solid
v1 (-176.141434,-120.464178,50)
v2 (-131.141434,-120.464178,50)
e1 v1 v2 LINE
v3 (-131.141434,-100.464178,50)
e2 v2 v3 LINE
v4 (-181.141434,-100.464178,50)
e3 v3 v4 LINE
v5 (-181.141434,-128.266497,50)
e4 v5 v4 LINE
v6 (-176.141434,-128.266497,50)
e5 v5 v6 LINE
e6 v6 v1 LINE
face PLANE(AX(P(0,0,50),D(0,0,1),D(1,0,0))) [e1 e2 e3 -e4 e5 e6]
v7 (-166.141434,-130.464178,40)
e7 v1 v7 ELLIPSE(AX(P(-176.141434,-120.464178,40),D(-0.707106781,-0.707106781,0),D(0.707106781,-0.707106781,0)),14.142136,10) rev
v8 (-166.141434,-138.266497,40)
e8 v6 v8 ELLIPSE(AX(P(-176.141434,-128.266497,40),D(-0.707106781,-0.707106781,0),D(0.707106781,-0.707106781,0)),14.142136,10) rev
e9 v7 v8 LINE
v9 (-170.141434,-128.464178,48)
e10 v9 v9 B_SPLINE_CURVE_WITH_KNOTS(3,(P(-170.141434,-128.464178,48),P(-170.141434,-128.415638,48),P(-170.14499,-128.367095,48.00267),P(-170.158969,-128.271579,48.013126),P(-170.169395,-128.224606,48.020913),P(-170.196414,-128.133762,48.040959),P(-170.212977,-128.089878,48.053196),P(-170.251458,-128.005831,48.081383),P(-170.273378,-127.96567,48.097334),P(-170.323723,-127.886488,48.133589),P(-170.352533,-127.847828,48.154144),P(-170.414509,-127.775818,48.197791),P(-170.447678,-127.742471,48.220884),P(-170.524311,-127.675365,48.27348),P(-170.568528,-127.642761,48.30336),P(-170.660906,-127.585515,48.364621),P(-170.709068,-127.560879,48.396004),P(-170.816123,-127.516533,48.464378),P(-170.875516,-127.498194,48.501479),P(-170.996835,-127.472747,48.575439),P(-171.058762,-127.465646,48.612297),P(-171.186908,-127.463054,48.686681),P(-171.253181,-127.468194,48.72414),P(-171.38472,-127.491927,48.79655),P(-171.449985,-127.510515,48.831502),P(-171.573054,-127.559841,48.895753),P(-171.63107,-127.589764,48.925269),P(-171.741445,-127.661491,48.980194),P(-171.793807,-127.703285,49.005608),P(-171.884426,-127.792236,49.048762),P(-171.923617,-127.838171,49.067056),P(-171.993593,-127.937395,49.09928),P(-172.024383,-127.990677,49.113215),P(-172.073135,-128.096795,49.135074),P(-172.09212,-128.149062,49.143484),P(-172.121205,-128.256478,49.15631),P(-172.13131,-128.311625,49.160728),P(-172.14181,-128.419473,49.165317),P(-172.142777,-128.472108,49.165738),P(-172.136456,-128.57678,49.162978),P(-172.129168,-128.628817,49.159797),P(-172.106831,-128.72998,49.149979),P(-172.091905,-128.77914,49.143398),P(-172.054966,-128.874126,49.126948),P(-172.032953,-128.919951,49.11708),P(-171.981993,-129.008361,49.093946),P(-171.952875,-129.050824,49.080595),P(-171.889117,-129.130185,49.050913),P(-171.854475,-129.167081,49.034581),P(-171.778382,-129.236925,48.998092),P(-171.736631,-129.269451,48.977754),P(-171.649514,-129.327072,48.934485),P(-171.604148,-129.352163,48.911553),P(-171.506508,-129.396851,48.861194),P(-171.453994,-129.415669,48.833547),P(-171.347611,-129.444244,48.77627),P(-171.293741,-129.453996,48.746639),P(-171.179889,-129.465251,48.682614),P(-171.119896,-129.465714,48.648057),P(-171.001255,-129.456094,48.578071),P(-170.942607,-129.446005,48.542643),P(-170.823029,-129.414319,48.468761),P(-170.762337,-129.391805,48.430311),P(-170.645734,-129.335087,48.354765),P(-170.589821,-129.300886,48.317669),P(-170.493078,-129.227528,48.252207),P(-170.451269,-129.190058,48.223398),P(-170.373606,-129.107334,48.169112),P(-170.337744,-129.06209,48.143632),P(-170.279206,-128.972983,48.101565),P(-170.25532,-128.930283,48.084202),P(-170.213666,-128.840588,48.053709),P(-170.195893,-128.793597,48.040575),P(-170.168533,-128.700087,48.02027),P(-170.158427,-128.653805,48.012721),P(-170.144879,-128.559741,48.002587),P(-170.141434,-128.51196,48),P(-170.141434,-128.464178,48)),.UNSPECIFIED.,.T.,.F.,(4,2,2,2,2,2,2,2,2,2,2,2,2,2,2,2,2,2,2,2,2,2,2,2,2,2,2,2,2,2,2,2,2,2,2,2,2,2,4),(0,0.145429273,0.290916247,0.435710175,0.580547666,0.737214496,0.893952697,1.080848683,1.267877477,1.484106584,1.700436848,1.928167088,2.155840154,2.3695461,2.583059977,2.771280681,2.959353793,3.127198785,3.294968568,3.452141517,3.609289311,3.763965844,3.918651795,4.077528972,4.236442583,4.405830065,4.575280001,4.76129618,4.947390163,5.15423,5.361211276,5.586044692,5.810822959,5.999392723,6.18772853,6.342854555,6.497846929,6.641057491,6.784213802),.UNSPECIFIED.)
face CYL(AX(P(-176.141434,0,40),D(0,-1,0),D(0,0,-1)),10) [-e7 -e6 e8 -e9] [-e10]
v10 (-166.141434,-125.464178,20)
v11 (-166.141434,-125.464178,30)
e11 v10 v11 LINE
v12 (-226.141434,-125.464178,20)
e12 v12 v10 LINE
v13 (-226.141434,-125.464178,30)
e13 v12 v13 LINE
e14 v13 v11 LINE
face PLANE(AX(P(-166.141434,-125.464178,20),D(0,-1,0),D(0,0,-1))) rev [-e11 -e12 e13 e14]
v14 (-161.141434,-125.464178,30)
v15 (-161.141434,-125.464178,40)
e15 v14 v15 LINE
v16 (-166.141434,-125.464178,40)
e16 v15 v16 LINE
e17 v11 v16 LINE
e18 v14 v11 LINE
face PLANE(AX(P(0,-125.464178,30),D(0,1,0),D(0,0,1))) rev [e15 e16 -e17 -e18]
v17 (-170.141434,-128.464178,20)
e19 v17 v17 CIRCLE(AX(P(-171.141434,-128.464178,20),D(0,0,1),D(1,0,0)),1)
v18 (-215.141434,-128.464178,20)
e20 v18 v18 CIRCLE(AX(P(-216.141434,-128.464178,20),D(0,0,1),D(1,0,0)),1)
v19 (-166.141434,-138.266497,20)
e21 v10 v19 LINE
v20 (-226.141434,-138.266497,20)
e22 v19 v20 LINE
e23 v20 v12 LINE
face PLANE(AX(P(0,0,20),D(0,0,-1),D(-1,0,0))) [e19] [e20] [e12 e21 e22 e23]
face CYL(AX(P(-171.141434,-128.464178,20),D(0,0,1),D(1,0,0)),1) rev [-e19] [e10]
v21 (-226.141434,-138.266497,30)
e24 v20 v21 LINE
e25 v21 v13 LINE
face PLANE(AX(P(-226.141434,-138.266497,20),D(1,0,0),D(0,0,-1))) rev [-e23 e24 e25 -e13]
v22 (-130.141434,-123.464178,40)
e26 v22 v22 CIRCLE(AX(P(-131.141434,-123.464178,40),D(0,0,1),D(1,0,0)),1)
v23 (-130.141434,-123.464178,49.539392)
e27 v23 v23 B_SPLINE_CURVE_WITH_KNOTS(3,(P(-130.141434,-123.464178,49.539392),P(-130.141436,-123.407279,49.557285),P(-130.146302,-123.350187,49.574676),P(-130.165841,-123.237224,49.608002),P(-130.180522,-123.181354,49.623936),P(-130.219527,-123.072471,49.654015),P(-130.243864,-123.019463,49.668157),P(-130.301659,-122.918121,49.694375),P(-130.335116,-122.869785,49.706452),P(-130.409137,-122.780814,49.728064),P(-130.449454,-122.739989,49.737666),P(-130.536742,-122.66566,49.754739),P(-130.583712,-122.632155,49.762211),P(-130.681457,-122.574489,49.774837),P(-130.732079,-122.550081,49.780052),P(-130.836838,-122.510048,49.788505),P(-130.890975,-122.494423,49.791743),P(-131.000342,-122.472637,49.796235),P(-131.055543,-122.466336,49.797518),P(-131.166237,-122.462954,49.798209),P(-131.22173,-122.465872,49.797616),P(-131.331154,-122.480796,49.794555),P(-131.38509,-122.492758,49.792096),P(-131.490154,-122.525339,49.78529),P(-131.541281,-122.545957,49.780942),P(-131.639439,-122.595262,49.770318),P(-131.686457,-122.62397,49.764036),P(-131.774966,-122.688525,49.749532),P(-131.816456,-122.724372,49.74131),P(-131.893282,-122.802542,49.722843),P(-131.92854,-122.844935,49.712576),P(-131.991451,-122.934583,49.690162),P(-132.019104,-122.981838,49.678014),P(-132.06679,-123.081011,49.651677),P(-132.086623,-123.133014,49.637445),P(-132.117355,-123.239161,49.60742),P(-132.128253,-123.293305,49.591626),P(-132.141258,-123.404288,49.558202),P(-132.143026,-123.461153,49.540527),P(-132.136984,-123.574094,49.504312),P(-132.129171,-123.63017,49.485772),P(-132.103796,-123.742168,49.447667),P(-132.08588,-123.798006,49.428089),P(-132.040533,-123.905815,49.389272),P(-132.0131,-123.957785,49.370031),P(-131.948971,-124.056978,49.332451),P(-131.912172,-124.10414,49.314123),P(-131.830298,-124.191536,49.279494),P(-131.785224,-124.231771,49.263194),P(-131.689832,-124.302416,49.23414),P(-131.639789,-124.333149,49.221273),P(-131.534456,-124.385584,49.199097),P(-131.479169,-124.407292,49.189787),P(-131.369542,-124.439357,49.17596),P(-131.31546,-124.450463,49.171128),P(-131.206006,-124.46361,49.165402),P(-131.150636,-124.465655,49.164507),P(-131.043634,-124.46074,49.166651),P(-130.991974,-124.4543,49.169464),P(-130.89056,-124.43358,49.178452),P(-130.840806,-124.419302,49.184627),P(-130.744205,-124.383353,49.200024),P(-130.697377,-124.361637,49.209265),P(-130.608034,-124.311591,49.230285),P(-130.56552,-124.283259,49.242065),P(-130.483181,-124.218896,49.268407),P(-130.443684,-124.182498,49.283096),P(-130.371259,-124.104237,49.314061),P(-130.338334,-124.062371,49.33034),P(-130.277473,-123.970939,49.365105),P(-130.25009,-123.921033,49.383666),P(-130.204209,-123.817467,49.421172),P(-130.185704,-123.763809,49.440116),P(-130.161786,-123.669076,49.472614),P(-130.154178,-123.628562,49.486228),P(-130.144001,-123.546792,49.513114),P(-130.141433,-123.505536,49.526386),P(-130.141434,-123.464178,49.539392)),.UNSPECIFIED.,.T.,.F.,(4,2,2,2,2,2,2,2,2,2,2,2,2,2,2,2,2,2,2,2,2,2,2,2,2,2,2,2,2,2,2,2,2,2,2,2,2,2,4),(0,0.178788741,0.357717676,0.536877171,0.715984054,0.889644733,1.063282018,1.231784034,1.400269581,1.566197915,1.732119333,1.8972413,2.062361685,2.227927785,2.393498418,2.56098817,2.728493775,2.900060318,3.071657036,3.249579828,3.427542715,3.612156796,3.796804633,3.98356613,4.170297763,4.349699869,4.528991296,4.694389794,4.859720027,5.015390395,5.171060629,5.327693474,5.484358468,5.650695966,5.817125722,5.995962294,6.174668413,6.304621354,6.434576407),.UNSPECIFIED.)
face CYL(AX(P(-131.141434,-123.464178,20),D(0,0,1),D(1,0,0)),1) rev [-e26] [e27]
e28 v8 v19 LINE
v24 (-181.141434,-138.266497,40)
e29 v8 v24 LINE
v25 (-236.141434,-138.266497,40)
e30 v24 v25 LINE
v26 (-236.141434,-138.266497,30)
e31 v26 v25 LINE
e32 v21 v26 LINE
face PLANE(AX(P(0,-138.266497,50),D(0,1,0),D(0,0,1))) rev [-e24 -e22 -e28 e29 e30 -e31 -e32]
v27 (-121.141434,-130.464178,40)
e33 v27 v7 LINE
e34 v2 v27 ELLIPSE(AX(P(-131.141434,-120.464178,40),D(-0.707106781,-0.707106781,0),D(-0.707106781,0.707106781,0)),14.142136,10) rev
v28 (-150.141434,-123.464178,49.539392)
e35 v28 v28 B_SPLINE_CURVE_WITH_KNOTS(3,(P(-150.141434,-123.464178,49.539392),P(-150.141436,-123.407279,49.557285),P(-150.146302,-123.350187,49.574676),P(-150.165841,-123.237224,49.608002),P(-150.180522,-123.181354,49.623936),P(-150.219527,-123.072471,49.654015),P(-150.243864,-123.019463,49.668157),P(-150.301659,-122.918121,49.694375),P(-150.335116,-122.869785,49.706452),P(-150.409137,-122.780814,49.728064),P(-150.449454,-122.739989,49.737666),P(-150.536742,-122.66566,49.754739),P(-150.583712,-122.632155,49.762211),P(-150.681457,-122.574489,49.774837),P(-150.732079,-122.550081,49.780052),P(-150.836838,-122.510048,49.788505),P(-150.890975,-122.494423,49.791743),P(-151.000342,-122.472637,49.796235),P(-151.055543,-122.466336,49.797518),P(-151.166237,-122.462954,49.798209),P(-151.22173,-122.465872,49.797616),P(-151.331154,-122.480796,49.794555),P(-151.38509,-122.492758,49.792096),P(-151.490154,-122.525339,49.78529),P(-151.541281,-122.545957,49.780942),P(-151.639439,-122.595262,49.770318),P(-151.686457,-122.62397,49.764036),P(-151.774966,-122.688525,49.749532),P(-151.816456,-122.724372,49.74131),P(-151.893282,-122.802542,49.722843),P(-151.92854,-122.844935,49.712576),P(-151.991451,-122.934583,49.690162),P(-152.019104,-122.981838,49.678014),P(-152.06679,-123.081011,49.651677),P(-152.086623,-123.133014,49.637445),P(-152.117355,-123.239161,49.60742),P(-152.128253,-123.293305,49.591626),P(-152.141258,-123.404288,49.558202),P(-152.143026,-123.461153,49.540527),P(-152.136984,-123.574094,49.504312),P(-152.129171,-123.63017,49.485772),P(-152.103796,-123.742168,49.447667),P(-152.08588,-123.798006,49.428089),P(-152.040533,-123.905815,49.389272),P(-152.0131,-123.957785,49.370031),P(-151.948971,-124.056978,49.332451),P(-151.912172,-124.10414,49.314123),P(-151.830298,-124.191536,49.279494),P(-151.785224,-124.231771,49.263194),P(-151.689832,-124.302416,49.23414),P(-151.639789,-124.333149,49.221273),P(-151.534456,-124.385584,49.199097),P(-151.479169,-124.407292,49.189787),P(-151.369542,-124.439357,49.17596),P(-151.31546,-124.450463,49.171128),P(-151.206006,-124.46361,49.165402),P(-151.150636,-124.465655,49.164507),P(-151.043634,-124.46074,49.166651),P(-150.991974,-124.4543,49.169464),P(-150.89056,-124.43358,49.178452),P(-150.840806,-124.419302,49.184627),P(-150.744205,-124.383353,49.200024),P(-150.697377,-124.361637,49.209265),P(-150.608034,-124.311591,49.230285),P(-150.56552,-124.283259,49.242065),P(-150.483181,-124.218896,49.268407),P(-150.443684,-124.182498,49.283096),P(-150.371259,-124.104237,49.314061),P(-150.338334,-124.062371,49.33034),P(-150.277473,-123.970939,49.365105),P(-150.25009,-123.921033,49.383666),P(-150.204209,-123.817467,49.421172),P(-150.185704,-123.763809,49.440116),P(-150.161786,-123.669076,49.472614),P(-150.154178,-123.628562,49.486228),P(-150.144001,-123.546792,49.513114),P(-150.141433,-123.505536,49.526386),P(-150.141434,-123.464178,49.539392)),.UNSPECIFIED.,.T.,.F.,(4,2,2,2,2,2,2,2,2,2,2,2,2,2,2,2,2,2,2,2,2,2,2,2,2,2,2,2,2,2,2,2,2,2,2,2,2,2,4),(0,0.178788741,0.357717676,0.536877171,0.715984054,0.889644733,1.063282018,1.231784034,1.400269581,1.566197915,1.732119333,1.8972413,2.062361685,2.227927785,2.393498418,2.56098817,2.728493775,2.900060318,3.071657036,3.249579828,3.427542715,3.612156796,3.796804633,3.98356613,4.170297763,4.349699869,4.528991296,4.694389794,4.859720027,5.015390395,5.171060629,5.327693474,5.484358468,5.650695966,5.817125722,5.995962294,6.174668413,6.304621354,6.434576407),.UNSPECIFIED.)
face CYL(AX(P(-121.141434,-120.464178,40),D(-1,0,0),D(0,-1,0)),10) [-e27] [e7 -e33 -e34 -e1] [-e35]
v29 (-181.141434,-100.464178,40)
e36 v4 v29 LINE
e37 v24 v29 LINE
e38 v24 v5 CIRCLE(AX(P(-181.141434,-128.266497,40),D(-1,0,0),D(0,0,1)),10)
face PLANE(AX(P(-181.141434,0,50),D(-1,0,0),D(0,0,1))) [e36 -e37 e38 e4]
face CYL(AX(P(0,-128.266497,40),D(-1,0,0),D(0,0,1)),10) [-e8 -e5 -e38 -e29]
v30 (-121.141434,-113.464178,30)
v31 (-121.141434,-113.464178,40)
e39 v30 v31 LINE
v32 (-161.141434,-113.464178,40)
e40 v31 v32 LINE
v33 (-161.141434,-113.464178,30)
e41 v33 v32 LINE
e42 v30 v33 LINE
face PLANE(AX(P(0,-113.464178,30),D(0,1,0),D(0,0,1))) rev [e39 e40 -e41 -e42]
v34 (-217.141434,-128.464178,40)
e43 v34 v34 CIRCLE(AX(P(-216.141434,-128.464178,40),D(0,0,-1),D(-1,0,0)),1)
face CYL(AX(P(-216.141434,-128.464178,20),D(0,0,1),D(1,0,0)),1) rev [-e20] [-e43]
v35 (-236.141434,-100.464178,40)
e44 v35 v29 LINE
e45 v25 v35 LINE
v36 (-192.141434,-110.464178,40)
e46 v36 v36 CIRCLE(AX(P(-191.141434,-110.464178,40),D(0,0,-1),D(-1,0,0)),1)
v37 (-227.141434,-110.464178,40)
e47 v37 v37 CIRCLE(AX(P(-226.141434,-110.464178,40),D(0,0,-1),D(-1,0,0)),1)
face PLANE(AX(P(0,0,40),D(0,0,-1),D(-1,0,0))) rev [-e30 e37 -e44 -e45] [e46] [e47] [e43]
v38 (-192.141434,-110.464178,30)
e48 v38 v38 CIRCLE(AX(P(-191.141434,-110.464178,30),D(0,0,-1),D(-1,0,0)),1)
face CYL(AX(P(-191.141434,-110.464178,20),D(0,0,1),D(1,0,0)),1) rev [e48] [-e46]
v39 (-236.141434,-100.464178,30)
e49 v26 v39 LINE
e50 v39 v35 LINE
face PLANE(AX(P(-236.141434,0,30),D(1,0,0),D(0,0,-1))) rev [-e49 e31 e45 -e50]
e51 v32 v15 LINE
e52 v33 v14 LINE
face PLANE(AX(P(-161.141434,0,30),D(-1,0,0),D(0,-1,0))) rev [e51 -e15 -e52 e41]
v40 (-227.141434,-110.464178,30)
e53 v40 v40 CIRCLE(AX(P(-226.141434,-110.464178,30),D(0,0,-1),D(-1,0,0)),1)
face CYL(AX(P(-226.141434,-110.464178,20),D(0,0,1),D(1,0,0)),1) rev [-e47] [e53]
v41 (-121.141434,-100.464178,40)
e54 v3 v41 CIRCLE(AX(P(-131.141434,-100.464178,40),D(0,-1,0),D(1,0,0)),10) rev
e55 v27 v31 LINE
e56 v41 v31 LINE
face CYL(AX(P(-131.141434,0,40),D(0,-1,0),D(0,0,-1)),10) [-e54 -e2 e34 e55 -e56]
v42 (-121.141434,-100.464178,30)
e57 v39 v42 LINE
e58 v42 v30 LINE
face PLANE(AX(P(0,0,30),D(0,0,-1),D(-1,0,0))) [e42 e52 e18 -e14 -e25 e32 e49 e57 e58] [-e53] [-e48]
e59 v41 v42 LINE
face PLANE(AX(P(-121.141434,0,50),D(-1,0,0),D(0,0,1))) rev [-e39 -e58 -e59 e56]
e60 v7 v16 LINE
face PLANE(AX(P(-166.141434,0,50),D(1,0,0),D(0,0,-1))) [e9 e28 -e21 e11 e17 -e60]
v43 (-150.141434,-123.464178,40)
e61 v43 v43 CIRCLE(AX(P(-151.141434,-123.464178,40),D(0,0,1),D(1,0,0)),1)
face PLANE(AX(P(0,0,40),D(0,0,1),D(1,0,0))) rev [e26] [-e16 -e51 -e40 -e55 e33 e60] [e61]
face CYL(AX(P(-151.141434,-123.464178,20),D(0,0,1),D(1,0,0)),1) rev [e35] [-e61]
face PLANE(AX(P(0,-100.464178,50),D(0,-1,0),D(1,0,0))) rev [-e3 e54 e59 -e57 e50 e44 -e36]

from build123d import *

# Parameters (mm, degrees)
ESQUISSE1_W             = 15
ESQUISSE1_H             = 7.802319197
BOSS_EXTRU_1_DEPTH      = 10
ESQUISSE2_W             = 55
ESQUISSE2_H             = 12.802319197
ESQUISSE2_W_2           = 40
ESQUISSE2_H_2           = 13
ESQUISSE2_H_3           = 25
BOSS_EXTRU_2_DEPTH      = 10
ESQUISSE3_W             = 60
ESQUISSE3_H             = 12.802319197
BOSS_EXTRU_3_DEPTH      = 10
CONG_1_R                = 10
ESQUISSE4_R             = 1
ENL_V_MAT_EXTRU_1_DEPTH = 276.282402739


with BuildPart() as part:
    # Esquisse1 → Boss.-Extru.1 (new body)
    with BuildSketch(Plane.XY.offset(40)):
        Polygon((-166.141434162, -130.464178298), (-121.141434162, -130.464178298), (-121.141434162, -100.464178298), (-181.141434162, -100.464178298), (-181.141434162, -130.464178298), align=None)
        with Locations((-173.641434162, -134.365337897)):
            Rectangle(ESQUISSE1_W, ESQUISSE1_H)
    extrude(amount=BOSS_EXTRU_1_DEPTH)

    # Esquisse2 → Boss.-Extru.2 (add)
    with BuildSketch(Plane(origin=(0, 0, 40), x_dir=(-1, 0, 0), z_dir=(0, 0, -1))):
        with Locations((208.641434162, -131.865337897)):
            Rectangle(ESQUISSE2_W, ESQUISSE2_H)
        Polygon((181.141434162, -138.266497495), (181.141434162, -125.464178298), (166.141434162, -125.464178298), (166.141434162, -130.464178298), (166.141434162, -138.266497495), align=None)
        Polygon((181.141434162, -100.464178298), (161.141434162, -100.464178298), (161.141434162, -113.464178298), (161.141434162, -125.464178298), (166.141434162, -125.464178298), (181.141434162, -125.464178298), align=None)
        with Locations((141.141434162, -106.964178298)):
            Rectangle(ESQUISSE2_W_2, ESQUISSE2_H_2)
        with Locations((208.641434162, -112.964178298)):
            Rectangle(ESQUISSE2_W, ESQUISSE2_H_3)
    extrude(amount=BOSS_EXTRU_2_DEPTH)

    # Esquisse3 → Boss.-Extru.3 (add)
    with BuildSketch(Plane(origin=(0, 0, 30), x_dir=(-1, 0, 0), z_dir=(0, 0, -1))):
        with Locations((196.141434162, -131.865337897)):
            Rectangle(ESQUISSE3_W, ESQUISSE3_H)
    extrude(amount=BOSS_EXTRU_3_DEPTH)

    # Congé1
    cong_1_edges = [part.edges().sort_by_distance(p)[0] for p in [
        (-121.141434162, -115.464178298, 50),
        (-173.641434162, -138.266497495, 50),
        (-166.141434162, -134.365337896, 50),
        (-143.641434162, -130.464178298, 50),
    ]]
    fillet(cong_1_edges, radius=CONG_1_R - 0.0001)  # a hair under: the kernel refuses the full size

    # Esquisse4 → Enlèv. mat.-Extru.1 (cut, through all)
    with BuildSketch(Plane.XY.offset(50)):
        with Locations((-151.141434162, -123.464178298)):
            Circle(ESQUISSE4_R)
        with Locations((-131.141434162, -123.464178298)):
            Circle(ESQUISSE4_R)
        with Locations((-171.141434162, -128.464178298)):
            Circle(ESQUISSE4_R)
        with Locations((-216.141434162, -128.464178298)):
            Circle(ESQUISSE4_R)
        with Locations(Location((-226.141434162, -110.464178298, 0), (0, 0, 180))):
            Circle(ESQUISSE4_R)
        with Locations(Location((-191.141434162, -110.464178298, 0), (0, 0, 180))):
            Circle(ESQUISSE4_R)
    extrude(amount=-ENL_V_MAT_EXTRU_1_DEPTH, mode=Mode.SUBTRACT)


solid = part.part
